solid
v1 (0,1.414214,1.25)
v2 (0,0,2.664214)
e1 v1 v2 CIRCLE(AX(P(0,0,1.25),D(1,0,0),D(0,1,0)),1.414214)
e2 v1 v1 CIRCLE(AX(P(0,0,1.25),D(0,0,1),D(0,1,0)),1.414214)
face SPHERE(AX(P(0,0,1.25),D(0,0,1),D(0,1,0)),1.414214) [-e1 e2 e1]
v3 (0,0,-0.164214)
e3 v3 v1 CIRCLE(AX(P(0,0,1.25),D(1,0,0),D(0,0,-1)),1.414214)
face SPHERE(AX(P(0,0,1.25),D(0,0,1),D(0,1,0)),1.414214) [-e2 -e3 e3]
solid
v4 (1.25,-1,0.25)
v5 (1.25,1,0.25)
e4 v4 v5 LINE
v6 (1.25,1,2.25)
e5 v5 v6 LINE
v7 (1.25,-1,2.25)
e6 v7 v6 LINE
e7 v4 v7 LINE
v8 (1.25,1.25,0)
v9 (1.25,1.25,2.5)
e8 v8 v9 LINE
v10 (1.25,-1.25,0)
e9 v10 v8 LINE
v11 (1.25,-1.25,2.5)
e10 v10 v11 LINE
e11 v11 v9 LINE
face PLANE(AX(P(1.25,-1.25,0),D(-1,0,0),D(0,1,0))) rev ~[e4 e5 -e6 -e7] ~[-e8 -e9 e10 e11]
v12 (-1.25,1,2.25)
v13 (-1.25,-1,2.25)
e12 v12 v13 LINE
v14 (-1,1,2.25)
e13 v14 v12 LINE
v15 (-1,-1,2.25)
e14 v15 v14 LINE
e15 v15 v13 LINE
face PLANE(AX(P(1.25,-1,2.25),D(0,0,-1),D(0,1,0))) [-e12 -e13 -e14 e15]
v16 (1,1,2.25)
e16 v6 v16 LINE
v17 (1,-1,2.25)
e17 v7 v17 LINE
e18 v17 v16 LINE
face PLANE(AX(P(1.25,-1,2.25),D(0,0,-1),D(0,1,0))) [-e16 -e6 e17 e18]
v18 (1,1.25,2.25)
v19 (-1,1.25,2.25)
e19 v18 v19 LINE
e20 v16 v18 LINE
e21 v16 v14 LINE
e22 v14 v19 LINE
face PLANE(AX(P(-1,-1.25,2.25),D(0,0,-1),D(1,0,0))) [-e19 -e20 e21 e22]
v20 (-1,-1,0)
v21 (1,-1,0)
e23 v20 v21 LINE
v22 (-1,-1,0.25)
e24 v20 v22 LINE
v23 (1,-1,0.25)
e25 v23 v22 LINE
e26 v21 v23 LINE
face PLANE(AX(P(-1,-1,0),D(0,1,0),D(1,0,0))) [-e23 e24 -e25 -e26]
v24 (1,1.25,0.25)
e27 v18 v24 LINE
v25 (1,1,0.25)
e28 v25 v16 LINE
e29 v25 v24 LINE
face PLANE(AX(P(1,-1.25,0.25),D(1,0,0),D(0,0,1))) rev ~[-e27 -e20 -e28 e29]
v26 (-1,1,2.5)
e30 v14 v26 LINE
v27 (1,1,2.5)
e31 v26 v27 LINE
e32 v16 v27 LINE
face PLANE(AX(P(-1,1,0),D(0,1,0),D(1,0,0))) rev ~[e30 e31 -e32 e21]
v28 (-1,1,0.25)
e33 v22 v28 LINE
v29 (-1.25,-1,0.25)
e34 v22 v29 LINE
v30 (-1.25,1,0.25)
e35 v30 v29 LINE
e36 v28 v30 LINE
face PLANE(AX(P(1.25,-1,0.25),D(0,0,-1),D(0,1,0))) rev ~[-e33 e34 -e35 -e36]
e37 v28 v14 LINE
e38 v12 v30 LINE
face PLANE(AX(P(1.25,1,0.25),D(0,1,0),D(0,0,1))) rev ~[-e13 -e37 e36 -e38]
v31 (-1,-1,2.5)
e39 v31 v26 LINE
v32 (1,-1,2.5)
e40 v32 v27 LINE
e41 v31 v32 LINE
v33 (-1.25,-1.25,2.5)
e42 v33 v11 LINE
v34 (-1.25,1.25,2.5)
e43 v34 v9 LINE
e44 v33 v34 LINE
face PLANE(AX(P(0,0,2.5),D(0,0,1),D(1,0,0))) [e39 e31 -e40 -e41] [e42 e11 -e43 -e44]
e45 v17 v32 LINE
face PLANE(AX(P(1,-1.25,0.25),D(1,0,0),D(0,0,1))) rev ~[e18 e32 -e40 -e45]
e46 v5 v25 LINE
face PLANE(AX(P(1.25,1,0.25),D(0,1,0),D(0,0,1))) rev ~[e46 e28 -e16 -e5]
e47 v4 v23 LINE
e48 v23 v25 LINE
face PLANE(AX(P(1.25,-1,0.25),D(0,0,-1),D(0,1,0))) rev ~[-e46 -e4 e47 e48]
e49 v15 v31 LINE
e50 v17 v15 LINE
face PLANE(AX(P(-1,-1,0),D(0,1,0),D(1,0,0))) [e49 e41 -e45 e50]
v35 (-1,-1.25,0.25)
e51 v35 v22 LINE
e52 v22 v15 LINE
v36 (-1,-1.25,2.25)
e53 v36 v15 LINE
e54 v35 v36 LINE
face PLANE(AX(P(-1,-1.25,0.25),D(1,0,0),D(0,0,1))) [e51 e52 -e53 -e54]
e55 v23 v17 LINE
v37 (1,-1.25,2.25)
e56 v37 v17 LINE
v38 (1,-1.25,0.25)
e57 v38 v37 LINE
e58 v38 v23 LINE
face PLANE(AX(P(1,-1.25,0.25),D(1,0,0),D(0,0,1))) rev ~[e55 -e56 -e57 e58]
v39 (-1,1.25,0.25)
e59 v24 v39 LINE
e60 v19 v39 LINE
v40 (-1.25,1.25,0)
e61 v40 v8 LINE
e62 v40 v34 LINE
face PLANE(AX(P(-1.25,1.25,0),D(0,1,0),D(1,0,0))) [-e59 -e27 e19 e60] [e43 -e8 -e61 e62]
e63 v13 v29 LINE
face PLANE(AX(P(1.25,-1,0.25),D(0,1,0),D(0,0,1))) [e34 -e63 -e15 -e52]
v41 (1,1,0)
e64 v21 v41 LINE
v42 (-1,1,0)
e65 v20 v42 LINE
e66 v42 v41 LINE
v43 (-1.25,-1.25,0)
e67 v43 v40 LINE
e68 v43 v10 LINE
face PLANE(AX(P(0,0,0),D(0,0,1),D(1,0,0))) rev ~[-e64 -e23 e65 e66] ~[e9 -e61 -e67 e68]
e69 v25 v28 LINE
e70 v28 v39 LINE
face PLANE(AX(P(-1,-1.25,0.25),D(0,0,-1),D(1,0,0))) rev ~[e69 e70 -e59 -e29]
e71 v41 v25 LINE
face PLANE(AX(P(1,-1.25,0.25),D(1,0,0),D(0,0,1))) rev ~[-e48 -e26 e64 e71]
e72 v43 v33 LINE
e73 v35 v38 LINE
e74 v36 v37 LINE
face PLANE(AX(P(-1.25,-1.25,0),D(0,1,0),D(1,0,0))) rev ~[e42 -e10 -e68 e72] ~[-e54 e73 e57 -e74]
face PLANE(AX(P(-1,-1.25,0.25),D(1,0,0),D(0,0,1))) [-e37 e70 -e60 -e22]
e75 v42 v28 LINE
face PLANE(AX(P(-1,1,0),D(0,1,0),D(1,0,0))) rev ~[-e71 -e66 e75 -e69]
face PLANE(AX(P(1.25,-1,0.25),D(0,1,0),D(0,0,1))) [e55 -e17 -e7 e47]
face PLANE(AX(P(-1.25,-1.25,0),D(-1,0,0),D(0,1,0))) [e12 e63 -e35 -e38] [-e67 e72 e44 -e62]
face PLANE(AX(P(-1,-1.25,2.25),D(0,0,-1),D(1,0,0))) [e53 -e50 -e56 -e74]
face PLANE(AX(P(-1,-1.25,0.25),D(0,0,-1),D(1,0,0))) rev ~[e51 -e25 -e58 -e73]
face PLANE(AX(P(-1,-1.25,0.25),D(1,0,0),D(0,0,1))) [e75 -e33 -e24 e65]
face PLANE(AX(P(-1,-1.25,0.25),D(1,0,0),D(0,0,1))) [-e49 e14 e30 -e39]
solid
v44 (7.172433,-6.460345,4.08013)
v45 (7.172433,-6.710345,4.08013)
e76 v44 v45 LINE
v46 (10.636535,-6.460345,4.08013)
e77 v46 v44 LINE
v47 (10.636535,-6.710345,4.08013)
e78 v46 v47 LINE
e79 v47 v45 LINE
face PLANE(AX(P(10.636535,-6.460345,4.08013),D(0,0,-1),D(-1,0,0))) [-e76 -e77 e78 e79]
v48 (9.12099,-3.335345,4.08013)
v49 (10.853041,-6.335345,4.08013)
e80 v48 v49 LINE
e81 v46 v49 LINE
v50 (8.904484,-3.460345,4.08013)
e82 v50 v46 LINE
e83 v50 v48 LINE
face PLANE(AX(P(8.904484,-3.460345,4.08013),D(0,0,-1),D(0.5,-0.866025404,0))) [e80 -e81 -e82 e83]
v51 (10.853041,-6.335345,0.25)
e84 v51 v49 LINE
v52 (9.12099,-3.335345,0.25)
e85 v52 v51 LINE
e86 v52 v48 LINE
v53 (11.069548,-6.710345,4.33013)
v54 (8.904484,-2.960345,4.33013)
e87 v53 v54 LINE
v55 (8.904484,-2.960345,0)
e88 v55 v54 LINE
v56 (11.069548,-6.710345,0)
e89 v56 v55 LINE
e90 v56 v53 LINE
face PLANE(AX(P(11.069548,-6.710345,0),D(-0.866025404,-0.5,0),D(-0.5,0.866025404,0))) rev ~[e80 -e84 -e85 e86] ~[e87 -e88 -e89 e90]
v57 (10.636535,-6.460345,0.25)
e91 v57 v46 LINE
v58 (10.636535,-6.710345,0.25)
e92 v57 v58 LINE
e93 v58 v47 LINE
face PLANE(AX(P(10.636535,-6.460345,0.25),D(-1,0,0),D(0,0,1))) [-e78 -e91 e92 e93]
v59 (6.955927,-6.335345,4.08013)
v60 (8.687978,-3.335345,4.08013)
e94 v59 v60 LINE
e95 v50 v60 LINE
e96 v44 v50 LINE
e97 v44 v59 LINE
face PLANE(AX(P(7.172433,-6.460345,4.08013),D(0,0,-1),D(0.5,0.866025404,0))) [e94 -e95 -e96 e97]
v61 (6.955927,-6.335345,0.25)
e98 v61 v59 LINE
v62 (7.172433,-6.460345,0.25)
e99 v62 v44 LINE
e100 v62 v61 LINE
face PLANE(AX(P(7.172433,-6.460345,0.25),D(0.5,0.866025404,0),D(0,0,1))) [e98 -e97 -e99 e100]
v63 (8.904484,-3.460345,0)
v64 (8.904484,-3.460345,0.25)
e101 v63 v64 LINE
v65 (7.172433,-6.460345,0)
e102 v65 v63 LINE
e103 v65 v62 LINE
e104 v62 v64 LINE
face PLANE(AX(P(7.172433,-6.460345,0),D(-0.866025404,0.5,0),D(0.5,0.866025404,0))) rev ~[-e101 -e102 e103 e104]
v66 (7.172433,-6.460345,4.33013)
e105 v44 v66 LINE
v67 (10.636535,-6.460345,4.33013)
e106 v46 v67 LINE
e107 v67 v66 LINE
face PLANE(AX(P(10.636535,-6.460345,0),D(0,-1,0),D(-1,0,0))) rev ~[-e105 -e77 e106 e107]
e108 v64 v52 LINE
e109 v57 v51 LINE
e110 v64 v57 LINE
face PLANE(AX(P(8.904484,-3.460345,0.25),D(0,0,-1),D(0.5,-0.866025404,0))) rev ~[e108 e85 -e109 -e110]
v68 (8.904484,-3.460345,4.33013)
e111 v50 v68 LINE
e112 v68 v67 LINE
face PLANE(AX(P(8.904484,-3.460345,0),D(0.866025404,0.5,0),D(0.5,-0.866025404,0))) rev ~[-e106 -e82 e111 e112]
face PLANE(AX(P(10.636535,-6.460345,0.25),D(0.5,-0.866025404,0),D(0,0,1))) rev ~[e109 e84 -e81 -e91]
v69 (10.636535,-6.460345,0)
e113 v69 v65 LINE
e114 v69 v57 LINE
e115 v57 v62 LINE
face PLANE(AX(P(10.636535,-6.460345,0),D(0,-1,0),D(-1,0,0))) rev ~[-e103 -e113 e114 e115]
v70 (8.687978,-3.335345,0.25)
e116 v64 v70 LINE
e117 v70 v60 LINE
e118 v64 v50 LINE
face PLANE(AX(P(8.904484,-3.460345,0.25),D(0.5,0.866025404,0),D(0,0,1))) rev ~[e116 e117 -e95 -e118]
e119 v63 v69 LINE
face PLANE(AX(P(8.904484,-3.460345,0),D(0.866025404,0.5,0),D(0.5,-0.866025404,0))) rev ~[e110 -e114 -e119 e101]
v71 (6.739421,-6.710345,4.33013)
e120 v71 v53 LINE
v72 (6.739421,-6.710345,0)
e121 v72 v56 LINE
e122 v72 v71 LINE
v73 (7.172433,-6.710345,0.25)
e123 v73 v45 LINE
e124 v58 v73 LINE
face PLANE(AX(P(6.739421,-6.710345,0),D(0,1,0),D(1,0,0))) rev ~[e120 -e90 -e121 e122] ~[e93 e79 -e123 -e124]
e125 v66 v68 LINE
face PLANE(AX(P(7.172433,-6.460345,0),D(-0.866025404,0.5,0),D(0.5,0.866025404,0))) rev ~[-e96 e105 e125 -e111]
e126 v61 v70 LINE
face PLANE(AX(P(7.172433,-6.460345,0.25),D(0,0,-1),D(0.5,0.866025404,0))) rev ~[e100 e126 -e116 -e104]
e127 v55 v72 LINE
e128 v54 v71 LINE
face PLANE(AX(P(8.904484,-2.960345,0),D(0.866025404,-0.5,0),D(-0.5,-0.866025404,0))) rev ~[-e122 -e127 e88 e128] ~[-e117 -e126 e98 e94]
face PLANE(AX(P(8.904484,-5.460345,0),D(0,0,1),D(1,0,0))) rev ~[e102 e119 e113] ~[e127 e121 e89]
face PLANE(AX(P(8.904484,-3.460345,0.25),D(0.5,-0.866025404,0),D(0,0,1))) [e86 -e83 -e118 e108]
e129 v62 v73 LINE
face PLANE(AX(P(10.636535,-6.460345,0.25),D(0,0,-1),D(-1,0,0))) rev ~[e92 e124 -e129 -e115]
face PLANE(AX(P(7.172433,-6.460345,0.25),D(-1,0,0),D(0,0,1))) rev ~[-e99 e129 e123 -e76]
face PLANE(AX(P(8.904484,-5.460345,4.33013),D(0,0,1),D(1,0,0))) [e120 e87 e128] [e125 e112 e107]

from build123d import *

# Parameters (mm, degrees)
F0_W      = 2.5
F0_H      = 2.5
F0_W_2    = 2
F0_H_2    = 2
F1_DEPTH  = 2.5
F2_W      = 2
F2_H      = 2
F3_DEPTH  = 25
F4_W      = 2
F4_H      = 2
F5_DEPTH  = 25
F7_DEPTH  = 4.33013
F12_W     = 3.4641016151
F12_H     = 3.83013
F13_DEPTH = 25
F14_W     = 3.4641016151
F14_H     = 3.83013
F15_DEPTH = 25
F16_W     = 3.4641016151
F16_H     = 3.83013
F17_DEPTH = 25


# Not quite as in the source:
# - a feature of the source that left no trace in its solid (it failed there, or was rolled back) is left out


with BuildPart() as f1:
    # F0 (on Top) → F1 (new body)
    with BuildSketch(Plane.XY):
        Rectangle(F0_W, F0_H)
        Rectangle(F0_W_2, F0_H_2, mode=Mode.SUBTRACT)
    extrude(amount=F1_DEPTH)

    # F2 (on face) → F3 (cut)
    with BuildSketch(Plane.XZ.offset(1.25)):
        with Locations((0, 1.25)):
            Rectangle(F2_W, F2_H)
    extrude(amount=-F3_DEPTH, mode=Mode.SUBTRACT)

    # F4 (on face) → F5 (cut)
    with BuildSketch(Plane.YZ.offset(1.25)):
        with Locations((0, 1.25)):
            Rectangle(F4_W, F4_H)
    extrude(amount=-F5_DEPTH, mode=Mode.SUBTRACT)


with BuildPart() as f7:
    # F6 (on Top) → F7 (new body)
    with BuildSketch(Plane.XY):
        Polygon((8.9044841006, -2.9603447206), (6.7394205912, -6.7103447206), (11.0695476101, -6.7103447206), align=None)
        Polygon((8.9044841006, -3.4603447206), (10.6365349082, -6.4603447206), (7.1724332931, -6.4603447206), align=None, mode=Mode.SUBTRACT)
    extrude(amount=F7_DEPTH)

    # F12 (on face) → F13 (cut)
    with BuildSketch(Plane(origin=(0, -6.4603447206, 0), x_dir=(-1, 0, 0), z_dir=(0, 1, 0))):
        with Locations((-8.9044841006, 2.165065)):
            Rectangle(F12_W, F12_H)
    extrude(amount=-F13_DEPTH, mode=Mode.SUBTRACT)

    # F14 (on face) → F15 (cut)
    with BuildSketch(Plane(origin=(5.1799898585, 2.9906685392, 0), x_dir=(0.5, -0.8660254038, 0), z_dir=(-0.8660254038, -0.5, 0))):
        with Locations((9.1810392918, 2.165065)):
            Rectangle(F14_W, F14_H)
    extrude(amount=-F15_DEPTH, mode=Mode.SUBTRACT)

    # F16 (on face) → F17 (cut)
    with BuildSketch(Plane(origin=(8.1767362924, -4.7208408995, 0), x_dir=(0.5, 0.8660254038, 0), z_dir=(0.8660254038, -0.5, 0))):
        with Locations((-0.2765551912, 2.165065)):
            Rectangle(F16_W, F16_H)
    extrude(amount=-F17_DEPTH, mode=Mode.SUBTRACT)


with BuildPart() as f11:
    # F10 (on Right) → F11 (revolve)
    with BuildSketch(Plane.YZ):
        with BuildLine():
            Line((0, 2.6642135624), (0, -0.1642135624))
            ThreePointArc((0, -0.1642135624), (1, 0.25), (1.4142135624, 1.25))
            ThreePointArc((1.4142135624, 1.25), (1, 2.25), (0, 2.6642135624))
        make_face()
    revolve(axis=Axis((0, 0, 1.25), (0, 0, 1)))


solid = Compound([f1.part, f7.part, f11.part])
